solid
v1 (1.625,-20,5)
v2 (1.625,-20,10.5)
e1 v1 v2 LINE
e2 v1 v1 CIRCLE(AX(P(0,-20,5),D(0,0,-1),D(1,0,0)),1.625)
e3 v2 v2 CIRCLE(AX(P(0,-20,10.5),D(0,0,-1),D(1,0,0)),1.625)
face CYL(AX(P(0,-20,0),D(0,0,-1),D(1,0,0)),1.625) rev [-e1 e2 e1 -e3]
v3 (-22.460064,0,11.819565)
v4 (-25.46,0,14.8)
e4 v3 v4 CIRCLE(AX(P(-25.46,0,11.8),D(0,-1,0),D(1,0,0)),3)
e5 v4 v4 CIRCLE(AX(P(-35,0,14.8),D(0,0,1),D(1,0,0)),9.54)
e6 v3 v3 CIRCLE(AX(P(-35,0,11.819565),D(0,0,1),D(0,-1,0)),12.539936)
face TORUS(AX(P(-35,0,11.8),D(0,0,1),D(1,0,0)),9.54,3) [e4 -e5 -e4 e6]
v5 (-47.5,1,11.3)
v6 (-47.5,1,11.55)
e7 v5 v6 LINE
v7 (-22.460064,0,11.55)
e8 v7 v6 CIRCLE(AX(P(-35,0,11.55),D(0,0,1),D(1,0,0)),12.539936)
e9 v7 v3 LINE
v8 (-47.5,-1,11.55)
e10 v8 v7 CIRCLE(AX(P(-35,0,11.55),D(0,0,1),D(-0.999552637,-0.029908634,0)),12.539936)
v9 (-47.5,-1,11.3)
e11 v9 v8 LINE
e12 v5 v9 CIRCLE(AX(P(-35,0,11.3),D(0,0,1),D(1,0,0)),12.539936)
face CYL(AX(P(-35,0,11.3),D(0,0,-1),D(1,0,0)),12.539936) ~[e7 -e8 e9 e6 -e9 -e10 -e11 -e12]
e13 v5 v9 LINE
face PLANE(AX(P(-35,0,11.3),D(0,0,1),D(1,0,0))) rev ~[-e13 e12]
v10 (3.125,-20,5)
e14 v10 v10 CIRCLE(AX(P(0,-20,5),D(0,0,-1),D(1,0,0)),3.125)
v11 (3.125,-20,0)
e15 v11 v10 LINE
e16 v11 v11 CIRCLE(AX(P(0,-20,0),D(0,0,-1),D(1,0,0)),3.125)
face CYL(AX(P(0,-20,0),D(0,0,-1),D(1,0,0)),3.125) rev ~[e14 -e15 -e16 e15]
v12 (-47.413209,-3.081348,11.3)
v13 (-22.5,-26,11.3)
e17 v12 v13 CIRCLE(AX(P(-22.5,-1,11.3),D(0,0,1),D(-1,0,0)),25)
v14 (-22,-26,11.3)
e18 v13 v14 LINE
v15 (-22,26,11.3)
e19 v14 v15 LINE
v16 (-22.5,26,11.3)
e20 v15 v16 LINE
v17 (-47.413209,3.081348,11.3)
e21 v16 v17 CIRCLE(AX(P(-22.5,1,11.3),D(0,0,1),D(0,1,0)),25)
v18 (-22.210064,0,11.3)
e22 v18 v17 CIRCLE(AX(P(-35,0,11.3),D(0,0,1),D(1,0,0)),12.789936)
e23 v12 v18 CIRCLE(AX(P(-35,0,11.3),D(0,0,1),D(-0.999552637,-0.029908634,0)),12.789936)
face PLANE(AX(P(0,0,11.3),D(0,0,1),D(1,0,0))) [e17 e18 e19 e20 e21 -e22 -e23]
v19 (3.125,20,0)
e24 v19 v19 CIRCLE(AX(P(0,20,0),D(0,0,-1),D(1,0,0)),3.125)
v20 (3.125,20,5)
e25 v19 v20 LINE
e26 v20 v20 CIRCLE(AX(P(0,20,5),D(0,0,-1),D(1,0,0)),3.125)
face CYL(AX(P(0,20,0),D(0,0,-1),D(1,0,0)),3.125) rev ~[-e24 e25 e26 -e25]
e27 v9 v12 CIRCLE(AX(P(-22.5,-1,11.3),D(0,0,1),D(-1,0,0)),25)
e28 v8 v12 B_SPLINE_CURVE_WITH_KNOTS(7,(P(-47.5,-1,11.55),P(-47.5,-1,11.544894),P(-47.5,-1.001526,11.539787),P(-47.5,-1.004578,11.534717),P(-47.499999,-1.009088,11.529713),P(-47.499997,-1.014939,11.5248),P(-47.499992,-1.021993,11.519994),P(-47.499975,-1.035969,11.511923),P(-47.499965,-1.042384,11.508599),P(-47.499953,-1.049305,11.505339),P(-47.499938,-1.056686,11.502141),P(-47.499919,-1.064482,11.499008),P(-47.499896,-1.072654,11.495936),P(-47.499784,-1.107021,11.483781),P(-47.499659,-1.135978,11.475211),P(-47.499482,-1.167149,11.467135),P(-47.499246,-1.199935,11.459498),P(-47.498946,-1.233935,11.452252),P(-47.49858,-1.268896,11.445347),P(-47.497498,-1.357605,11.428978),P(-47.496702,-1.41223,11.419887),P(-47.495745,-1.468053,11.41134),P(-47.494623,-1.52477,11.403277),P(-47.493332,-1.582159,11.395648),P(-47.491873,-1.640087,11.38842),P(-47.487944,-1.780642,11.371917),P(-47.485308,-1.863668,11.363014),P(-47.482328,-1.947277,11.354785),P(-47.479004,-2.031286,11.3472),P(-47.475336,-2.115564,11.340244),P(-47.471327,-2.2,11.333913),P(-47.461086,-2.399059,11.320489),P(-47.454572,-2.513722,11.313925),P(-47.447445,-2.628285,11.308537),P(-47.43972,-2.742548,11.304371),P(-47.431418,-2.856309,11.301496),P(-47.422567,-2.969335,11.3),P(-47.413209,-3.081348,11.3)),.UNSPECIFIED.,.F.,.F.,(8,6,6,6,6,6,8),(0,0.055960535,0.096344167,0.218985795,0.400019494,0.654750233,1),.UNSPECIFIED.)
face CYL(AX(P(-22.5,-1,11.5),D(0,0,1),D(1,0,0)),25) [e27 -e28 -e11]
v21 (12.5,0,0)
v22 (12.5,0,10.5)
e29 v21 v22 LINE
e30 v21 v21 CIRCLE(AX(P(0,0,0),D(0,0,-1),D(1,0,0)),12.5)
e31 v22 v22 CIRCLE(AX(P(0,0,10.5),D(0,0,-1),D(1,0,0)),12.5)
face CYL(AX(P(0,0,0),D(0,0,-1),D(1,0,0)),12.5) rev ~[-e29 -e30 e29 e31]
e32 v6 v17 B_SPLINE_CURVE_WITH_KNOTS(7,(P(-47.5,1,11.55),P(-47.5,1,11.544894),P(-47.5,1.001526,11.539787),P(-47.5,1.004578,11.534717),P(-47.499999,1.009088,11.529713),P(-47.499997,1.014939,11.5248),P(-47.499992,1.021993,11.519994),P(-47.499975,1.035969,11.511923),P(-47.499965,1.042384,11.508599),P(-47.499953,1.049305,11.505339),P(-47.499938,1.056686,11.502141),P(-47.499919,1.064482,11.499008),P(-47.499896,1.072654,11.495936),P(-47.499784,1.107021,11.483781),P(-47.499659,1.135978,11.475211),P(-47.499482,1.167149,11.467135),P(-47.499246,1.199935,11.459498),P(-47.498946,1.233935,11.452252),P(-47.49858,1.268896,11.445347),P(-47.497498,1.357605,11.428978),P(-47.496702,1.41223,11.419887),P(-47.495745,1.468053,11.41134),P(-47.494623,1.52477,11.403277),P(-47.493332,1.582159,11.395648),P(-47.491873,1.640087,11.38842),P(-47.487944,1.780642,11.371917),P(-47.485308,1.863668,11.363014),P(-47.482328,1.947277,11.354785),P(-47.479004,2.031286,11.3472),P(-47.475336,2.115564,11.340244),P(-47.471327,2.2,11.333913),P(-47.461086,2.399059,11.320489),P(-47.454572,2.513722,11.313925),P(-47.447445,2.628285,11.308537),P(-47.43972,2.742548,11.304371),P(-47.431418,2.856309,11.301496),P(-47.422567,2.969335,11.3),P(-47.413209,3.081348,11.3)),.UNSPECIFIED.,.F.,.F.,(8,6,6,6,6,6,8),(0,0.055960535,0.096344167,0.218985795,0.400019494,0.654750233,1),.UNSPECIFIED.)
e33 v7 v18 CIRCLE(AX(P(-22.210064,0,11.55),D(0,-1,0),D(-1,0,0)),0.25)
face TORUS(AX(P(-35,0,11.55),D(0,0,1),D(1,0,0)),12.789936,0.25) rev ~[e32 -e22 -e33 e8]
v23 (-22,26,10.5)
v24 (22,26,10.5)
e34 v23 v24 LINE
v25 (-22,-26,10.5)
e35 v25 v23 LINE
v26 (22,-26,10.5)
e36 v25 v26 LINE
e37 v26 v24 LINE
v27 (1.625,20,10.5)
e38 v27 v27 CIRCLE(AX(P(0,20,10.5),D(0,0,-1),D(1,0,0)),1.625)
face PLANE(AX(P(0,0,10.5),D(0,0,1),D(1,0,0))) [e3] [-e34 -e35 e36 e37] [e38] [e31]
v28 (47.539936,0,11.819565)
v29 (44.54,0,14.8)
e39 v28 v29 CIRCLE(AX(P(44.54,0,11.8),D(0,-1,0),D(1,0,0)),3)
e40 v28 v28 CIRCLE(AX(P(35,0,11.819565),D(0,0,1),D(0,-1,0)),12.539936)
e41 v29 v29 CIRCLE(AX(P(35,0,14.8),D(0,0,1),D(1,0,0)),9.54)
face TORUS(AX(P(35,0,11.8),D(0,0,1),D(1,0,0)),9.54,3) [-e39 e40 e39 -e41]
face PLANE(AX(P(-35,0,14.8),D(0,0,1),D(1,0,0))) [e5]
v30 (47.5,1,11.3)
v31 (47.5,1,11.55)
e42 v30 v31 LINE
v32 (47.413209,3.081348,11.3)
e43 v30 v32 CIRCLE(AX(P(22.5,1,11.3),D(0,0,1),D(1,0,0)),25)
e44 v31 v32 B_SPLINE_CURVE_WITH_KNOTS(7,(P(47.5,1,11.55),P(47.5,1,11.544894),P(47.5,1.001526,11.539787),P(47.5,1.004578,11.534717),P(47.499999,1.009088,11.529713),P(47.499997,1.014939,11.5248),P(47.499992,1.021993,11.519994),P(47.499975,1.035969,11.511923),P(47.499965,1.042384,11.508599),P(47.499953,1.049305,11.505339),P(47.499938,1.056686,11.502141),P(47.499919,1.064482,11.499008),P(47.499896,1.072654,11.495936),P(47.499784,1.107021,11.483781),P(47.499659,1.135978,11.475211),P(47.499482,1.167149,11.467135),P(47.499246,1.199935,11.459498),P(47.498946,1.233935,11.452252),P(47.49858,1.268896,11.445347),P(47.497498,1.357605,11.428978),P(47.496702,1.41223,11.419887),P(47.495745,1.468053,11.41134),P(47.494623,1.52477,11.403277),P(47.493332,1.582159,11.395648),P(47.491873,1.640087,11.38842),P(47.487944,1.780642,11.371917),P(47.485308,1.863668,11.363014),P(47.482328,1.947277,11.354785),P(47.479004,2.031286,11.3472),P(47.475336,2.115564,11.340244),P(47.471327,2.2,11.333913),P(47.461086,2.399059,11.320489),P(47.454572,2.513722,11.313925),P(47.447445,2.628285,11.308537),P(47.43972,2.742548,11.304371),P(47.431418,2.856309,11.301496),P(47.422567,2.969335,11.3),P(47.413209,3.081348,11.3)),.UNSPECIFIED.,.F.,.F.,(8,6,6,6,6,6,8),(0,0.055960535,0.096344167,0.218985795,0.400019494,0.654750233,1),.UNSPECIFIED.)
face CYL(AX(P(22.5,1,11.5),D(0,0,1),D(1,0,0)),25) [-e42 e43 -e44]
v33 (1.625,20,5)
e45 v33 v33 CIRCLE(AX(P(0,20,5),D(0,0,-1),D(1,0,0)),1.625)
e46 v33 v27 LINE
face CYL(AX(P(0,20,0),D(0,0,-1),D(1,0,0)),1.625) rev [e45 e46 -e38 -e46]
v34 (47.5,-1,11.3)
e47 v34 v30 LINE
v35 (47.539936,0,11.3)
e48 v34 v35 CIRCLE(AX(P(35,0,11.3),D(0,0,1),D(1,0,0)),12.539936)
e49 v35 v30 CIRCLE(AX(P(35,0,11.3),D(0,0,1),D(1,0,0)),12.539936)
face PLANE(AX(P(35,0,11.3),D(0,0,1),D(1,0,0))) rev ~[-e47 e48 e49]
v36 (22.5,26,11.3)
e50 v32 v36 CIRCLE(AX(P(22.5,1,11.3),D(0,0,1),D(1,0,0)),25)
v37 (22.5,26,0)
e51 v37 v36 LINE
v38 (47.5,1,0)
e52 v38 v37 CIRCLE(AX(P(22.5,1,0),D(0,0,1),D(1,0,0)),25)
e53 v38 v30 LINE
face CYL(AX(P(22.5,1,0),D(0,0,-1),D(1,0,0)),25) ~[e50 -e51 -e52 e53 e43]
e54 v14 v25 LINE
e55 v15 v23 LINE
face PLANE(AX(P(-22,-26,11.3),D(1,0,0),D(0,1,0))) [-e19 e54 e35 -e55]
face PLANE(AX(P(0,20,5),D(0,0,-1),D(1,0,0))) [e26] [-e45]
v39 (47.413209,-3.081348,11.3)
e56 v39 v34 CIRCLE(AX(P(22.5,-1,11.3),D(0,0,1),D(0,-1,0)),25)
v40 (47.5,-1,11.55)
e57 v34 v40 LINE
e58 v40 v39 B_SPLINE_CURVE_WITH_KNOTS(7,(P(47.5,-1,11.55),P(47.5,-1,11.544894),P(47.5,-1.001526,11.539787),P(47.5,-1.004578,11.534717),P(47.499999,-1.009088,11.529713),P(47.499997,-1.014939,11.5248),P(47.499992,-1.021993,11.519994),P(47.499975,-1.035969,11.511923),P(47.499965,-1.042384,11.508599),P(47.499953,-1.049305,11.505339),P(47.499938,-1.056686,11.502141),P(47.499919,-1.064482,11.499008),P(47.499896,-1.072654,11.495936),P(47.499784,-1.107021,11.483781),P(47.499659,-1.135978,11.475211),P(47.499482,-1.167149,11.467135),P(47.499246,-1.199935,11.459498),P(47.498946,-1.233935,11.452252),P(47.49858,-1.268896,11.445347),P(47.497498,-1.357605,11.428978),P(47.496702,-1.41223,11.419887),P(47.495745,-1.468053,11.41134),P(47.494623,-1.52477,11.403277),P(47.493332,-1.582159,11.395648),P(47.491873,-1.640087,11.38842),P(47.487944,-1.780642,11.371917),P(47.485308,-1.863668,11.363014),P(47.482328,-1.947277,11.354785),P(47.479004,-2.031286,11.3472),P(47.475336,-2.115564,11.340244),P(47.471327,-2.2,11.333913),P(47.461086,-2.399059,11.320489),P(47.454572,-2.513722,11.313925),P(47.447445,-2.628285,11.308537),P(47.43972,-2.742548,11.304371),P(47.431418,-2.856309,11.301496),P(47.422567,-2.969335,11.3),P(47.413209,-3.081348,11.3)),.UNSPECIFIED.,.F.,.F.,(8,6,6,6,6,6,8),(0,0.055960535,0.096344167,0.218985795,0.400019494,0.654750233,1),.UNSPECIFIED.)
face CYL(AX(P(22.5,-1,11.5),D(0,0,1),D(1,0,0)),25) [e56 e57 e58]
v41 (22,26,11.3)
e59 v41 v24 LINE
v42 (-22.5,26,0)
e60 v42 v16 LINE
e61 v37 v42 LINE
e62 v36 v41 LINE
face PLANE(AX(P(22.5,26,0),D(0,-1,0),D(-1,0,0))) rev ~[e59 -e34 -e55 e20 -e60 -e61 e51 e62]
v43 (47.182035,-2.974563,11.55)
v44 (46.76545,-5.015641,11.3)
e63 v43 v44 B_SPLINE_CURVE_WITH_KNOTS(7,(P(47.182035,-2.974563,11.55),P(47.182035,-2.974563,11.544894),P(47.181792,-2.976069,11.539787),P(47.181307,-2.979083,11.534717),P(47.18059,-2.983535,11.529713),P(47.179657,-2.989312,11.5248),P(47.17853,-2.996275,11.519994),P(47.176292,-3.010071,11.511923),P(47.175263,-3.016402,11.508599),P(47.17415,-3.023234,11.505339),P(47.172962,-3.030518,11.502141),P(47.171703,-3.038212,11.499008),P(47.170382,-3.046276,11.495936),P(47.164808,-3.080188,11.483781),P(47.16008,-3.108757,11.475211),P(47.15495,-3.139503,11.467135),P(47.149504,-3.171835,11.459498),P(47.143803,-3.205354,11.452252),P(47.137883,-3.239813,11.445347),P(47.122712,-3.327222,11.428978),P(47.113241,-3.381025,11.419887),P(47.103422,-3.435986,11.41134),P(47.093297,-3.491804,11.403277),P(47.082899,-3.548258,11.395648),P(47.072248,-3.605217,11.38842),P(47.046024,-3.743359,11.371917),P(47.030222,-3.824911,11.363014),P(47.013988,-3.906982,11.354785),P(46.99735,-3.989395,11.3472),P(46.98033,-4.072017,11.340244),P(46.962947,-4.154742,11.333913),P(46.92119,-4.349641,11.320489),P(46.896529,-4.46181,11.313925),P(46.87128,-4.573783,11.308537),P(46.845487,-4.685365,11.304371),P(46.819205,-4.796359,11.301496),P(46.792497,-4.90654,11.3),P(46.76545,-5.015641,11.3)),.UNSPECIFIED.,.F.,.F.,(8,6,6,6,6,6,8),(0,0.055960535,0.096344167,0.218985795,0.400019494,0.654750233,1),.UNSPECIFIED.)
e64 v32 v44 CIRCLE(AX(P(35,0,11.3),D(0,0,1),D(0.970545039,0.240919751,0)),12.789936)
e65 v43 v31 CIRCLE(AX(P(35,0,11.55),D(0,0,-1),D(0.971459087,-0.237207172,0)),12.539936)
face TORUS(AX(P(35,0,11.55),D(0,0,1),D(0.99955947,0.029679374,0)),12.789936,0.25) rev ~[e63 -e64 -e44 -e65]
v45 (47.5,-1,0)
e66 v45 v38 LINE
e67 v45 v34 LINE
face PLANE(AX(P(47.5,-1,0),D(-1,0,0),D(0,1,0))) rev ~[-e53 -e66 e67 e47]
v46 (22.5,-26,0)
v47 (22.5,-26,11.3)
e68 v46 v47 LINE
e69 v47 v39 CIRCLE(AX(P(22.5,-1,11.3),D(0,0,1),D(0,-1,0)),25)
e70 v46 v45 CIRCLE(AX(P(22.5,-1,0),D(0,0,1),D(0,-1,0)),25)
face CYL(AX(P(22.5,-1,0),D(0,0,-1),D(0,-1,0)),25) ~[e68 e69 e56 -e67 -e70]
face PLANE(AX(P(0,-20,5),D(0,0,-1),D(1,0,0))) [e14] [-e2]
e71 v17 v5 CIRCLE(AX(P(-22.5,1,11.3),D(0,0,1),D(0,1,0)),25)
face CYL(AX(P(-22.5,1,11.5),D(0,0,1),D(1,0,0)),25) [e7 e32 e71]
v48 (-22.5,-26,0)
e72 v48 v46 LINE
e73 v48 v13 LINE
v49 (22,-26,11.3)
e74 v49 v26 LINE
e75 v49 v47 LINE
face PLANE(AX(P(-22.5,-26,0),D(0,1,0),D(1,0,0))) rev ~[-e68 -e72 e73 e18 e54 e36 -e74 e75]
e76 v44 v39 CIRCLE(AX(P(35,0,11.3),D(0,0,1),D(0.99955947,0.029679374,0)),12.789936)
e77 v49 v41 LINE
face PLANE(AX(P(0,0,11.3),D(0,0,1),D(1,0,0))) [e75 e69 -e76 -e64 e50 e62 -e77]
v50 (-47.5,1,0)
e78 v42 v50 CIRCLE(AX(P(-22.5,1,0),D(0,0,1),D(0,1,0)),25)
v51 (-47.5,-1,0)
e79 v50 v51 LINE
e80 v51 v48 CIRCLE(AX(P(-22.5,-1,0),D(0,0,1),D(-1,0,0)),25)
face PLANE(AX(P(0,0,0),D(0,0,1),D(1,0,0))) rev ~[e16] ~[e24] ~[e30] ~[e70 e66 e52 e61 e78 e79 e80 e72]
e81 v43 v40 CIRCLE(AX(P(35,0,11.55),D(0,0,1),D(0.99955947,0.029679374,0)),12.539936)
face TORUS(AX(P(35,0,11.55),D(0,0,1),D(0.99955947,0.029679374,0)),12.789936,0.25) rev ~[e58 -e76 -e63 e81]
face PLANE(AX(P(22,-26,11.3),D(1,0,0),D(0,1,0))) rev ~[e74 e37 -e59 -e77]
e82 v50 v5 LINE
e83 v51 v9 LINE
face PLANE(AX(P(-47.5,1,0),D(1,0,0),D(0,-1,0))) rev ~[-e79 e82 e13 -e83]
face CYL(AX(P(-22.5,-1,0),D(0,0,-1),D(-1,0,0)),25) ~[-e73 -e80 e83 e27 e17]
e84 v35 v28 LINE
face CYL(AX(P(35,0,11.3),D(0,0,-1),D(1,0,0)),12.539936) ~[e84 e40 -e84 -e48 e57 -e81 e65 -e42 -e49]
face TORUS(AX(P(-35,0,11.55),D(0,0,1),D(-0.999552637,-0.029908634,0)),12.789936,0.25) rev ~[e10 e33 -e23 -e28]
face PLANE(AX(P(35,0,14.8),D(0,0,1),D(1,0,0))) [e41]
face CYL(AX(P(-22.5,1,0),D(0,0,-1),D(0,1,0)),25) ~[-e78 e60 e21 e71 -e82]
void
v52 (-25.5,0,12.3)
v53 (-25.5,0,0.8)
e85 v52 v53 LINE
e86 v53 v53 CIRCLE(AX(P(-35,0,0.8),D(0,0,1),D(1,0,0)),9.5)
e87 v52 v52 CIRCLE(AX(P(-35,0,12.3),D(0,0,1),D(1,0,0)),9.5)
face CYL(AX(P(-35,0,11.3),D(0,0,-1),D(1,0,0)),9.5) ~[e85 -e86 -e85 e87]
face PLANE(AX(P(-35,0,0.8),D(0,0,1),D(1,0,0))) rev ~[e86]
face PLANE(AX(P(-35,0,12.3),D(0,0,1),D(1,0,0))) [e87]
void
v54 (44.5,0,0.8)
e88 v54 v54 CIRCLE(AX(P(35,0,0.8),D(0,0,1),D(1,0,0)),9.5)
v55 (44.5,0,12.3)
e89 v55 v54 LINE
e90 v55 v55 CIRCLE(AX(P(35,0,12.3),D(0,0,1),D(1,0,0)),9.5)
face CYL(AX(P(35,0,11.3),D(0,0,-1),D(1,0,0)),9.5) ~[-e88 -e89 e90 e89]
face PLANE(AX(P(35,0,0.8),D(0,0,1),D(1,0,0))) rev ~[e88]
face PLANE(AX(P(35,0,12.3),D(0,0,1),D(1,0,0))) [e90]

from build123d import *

# Parameters (mm, degrees)
F0_R          = 1.625
F1_DEPTH      = 11.3
F2_R          = 12.5
F3_DEPTH      = 11.301
F4_R          = 9.5
F5_DEPTH      = 10.5
F6_R          = 3.125
F7_DEPTH      = 5
F8_W          = 44
F8_H          = 52
F9_DEPTH      = 0.8
F10_R         = 12.539936204
F10_R_2       = 9.5
F11_DEPTH     = 1
F12_R         = 12.54
F13_DEPTH     = 2.5
F16_T4_ANGLE  = 178.2861059353
F16_S5_R      = 25
F16_T6_DEPTH  = 17
F16_T10_ANGLE = 178.2861059353
F16_S11_R     = 25
F16_T12_DEPTH = 17
F16_T16_ANGLE = 356.5984947452
F16_S17_R     = 25
F16_T18_DEPTH = 21
F16_T22_ANGLE = 356.5984947452
F16_S23_R     = 25
F16_T24_DEPTH = 21


# Not quite as in the source:
# - a fillet or chamfer that OpenCascade refuses, or shapes differently, is made with other operations: its cross-section is extruded or revolved along the edge and cut away or added
# - a feature of the source that left no trace in its solid (it failed there, or was rolled back) is left out


with BuildPart() as f1:
    # F0 (on Top) → F1 (new body)
    with BuildSketch(Plane.XY):
        with BuildLine():
            Line((-22.5, -26), (22.5, -26))
            ThreePointArc((22.5, -26), (40.1776695297, -18.6776695297), (47.5, -1))
            Line((47.5, -1), (47.5, 1))
            ThreePointArc((47.5, 1), (40.1776695297, 18.6776695297), (22.5, 26))
            Line((22.5, 26), (-22.5, 26))
            ThreePointArc((-22.5, 26), (-40.1776695297, 18.6776695297), (-47.5, 1))
            Line((-47.5, 1), (-47.5, -1))
            ThreePointArc((-47.5, -1), (-40.1776695297, -18.6776695297), (-22.5, -26))
        make_face()
        with Locations((0, -20)):
            Circle(F0_R, mode=Mode.SUBTRACT)
        with Locations((0, 20)):
            Circle(F0_R, mode=Mode.SUBTRACT)
    extrude(amount=F1_DEPTH)

    # F2 (on face) → F3 (cut, through all)
    with BuildSketch(Plane(origin=(0, 0, 0), x_dir=(1, 0, 0), z_dir=(0, 0, -1))):
        Circle(F2_R)
    extrude(amount=-F3_DEPTH, mode=Mode.SUBTRACT)

    # F4 (on face) → F5 (cut)
    with BuildSketch(Plane.XY.offset(11.3)):
        with Locations((-35, 0)):
            Circle(F4_R)
        with Locations((35, 0)):
            Circle(F4_R)
    extrude(amount=-F5_DEPTH, mode=Mode.SUBTRACT)

    # F6 (on face) → F7 (cut)
    with BuildSketch(Plane(origin=(0, 0, 0), x_dir=(1, 0, 0), z_dir=(0, 0, -1))):
        with Locations((0, 20)):
            Circle(F6_R)
        with Locations((0, -20)):
            Circle(F6_R)
    extrude(amount=-F7_DEPTH, mode=Mode.SUBTRACT)

    # F8 (on face) → F9 (cut)
    with BuildSketch(Plane.XY.offset(11.3)):
        Rectangle(F8_W, F8_H)
    extrude(amount=-F9_DEPTH, mode=Mode.SUBTRACT)

    # F10 (on face) → F11 (join)
    with BuildSketch(Plane.XY.offset(11.3)):
        with Locations((-35, 0)):
            Circle(F10_R)
        with Locations((-35, 0)):
            Circle(F10_R_2, mode=Mode.SUBTRACT)
        with Locations((35, 0)):
            Circle(F10_R)
        with Locations((35, 0)):
            Circle(F10_R_2, mode=Mode.SUBTRACT)
    extrude(amount=F11_DEPTH)

    # F12 (on face) → F13 (join)
    with BuildSketch(Plane.XY.offset(12.3)):
        with Locations((-35, 0)):
            Circle(F12_R)
        with Locations((35, 0)):
            Circle(F12_R)
    extrude(amount=F13_DEPTH)

    # F14: fillet of radius 3 on 1 edges, made by hand

    # F14_s1 → F14_t2 (revolve, cut)
    with BuildSketch(Plane.XZ):
        with BuildLine():
            ThreePointArc((-22.46, 11.8), (-23.3386796564, 13.9213203436), (-25.46, 14.8))
            Line((-25.46, 14.8), (-22.46, 14.8))
            Line((-22.46, 14.8), (-22.46, 11.8))
        make_face()
    revolve(axis=Axis((-35, 0, 14.8), (0, 0, 1)), mode=Mode.SUBTRACT)

    # F15: fillet of radius 3 on 1 edges, made by hand

    # F15_s1 → F15_t2 (revolve, cut)
    with BuildSketch(Plane.XZ):
        with BuildLine():
            ThreePointArc((47.54, 11.8), (46.6613203436, 13.9213203436), (44.54, 14.8))
            Line((44.54, 14.8), (47.54, 14.8))
            Line((47.54, 14.8), (47.54, 11.8))
        make_face()
    revolve(axis=Axis((35, 0, 14.8), (0, 0, 1)), mode=Mode.SUBTRACT)

    # F16: fillet of radius 0.25 on 3 edges, made by hand


with BuildPart() as f16_tool2:
    # F16_s3 → F16_t4 (revolve)
    with BuildSketch(Plane.XZ):
        with BuildLine():
            ThreePointArc((-22.460063796, 11.55), (-22.3868404913, 11.3732233047), (-22.210063796, 11.3))
            Line((-22.210063796, 11.3), (-22.460063796, 11.3))
            Line((-22.460063796, 11.3), (-22.460063796, 11.55))
        make_face()
    revolve(axis=Axis((-35, 0, 11.3), (0, 0, 1)), revolution_arc=F16_T4_ANGLE)

    # F16_s5 → F16_t6 (intersect, symmetric)
    with BuildSketch(Plane.XY.offset(11.5)):
        with Locations((-22.5, 1)):
            Circle(F16_S5_R)
    extrude(amount=F16_T6_DEPTH, both=True, mode=Mode.INTERSECT)


with BuildPart() as f1_1:
    add(f1.part)

    # F16_t1: union F16_tool2
    add(f16_tool2.part)


with BuildPart() as f16_tool8:
    # F16_s9 → F16_t10 (revolve)
    with BuildSketch(Plane(origin=(-0.0313084228, 1.046333877, 0), x_dir=(0, 0, 1), z_dir=(-0.0299086337, 0.9995526367, 0))):
        with BuildLine():
            ThreePointArc((11.55, -47.5242784902), (11.3732233047, -47.5975017949), (11.3, -47.7742784902))
            Line((11.3, -47.7742784902), (11.3, -47.5242784902))
            Line((11.3, -47.5242784902), (11.55, -47.5242784902))
        make_face()
    revolve(axis=Axis((-35, 0, 11.3), (0, 0, 1)), revolution_arc=F16_T10_ANGLE)

    # F16_s11 → F16_t12 (intersect, symmetric)
    with BuildSketch(Plane.XY.offset(11.5)):
        with Locations((-22.5, -1)):
            Circle(F16_S11_R)
    extrude(amount=F16_T12_DEPTH, both=True, mode=Mode.INTERSECT)


with BuildPart() as f1_2:
    add(f1_1.part)

    # F16_t7: union F16_tool8
    add(f16_tool8.part)


with BuildPart() as f16_tool14:
    # F16_s15 → F16_t16 (revolve)
    with BuildSketch(Plane(origin=(0.0308302837, -1.0383204819, 0), x_dir=(0, 0, 1), z_dir=(0.0296793741, -0.9995594703, 0))):
        with BuildLine():
            ThreePointArc((11.55, -47.524517666), (11.3732233047, -47.5977409707), (11.3, -47.774517666))
            Line((11.3, -47.774517666), (11.3, -47.524517666))
            Line((11.3, -47.524517666), (11.55, -47.524517666))
        make_face()
    revolve(axis=Axis((35, 0, 11.3), (0, 0, 1)), revolution_arc=F16_T16_ANGLE)

    # F16_s17 → F16_t18 (intersect, symmetric)
    with BuildSketch(Plane.XY.offset(11.5)):
        with Locations((22.5, 1)):
            Circle(F16_S17_R)
    extrude(amount=F16_T18_DEPTH, both=True, mode=Mode.INTERSECT)


with BuildPart() as f1_3:
    add(f1_2.part)

    # F16_t13: union F16_tool14
    add(f16_tool14.part)


with BuildPart() as f16_tool20:
    # F16_s21 → F16_t22 (revolve)
    with BuildSketch(Plane(origin=(0.0308302837, -1.0383204819, 0), x_dir=(0, 0, 1), z_dir=(0.0296793741, -0.9995594703, 0))):
        with BuildLine():
            ThreePointArc((11.55, -47.524517666), (11.3732233047, -47.5977409707), (11.3, -47.774517666))
            Line((11.3, -47.774517666), (11.3, -47.524517666))
            Line((11.3, -47.524517666), (11.55, -47.524517666))
        make_face()
    revolve(axis=Axis((35, 0, 11.3), (0, 0, 1)), revolution_arc=F16_T22_ANGLE)

    # F16_s23 → F16_t24 (intersect, symmetric)
    with BuildSketch(Plane.XY.offset(11.5)):
        with Locations((22.5, -1)):
            Circle(F16_S23_R)
    extrude(amount=F16_T24_DEPTH, both=True, mode=Mode.INTERSECT)


with BuildPart() as f1_4:
    add(f1_3.part)

    # F16_t19: union F16_tool20
    add(f16_tool20.part)


solid = f1_4.part
